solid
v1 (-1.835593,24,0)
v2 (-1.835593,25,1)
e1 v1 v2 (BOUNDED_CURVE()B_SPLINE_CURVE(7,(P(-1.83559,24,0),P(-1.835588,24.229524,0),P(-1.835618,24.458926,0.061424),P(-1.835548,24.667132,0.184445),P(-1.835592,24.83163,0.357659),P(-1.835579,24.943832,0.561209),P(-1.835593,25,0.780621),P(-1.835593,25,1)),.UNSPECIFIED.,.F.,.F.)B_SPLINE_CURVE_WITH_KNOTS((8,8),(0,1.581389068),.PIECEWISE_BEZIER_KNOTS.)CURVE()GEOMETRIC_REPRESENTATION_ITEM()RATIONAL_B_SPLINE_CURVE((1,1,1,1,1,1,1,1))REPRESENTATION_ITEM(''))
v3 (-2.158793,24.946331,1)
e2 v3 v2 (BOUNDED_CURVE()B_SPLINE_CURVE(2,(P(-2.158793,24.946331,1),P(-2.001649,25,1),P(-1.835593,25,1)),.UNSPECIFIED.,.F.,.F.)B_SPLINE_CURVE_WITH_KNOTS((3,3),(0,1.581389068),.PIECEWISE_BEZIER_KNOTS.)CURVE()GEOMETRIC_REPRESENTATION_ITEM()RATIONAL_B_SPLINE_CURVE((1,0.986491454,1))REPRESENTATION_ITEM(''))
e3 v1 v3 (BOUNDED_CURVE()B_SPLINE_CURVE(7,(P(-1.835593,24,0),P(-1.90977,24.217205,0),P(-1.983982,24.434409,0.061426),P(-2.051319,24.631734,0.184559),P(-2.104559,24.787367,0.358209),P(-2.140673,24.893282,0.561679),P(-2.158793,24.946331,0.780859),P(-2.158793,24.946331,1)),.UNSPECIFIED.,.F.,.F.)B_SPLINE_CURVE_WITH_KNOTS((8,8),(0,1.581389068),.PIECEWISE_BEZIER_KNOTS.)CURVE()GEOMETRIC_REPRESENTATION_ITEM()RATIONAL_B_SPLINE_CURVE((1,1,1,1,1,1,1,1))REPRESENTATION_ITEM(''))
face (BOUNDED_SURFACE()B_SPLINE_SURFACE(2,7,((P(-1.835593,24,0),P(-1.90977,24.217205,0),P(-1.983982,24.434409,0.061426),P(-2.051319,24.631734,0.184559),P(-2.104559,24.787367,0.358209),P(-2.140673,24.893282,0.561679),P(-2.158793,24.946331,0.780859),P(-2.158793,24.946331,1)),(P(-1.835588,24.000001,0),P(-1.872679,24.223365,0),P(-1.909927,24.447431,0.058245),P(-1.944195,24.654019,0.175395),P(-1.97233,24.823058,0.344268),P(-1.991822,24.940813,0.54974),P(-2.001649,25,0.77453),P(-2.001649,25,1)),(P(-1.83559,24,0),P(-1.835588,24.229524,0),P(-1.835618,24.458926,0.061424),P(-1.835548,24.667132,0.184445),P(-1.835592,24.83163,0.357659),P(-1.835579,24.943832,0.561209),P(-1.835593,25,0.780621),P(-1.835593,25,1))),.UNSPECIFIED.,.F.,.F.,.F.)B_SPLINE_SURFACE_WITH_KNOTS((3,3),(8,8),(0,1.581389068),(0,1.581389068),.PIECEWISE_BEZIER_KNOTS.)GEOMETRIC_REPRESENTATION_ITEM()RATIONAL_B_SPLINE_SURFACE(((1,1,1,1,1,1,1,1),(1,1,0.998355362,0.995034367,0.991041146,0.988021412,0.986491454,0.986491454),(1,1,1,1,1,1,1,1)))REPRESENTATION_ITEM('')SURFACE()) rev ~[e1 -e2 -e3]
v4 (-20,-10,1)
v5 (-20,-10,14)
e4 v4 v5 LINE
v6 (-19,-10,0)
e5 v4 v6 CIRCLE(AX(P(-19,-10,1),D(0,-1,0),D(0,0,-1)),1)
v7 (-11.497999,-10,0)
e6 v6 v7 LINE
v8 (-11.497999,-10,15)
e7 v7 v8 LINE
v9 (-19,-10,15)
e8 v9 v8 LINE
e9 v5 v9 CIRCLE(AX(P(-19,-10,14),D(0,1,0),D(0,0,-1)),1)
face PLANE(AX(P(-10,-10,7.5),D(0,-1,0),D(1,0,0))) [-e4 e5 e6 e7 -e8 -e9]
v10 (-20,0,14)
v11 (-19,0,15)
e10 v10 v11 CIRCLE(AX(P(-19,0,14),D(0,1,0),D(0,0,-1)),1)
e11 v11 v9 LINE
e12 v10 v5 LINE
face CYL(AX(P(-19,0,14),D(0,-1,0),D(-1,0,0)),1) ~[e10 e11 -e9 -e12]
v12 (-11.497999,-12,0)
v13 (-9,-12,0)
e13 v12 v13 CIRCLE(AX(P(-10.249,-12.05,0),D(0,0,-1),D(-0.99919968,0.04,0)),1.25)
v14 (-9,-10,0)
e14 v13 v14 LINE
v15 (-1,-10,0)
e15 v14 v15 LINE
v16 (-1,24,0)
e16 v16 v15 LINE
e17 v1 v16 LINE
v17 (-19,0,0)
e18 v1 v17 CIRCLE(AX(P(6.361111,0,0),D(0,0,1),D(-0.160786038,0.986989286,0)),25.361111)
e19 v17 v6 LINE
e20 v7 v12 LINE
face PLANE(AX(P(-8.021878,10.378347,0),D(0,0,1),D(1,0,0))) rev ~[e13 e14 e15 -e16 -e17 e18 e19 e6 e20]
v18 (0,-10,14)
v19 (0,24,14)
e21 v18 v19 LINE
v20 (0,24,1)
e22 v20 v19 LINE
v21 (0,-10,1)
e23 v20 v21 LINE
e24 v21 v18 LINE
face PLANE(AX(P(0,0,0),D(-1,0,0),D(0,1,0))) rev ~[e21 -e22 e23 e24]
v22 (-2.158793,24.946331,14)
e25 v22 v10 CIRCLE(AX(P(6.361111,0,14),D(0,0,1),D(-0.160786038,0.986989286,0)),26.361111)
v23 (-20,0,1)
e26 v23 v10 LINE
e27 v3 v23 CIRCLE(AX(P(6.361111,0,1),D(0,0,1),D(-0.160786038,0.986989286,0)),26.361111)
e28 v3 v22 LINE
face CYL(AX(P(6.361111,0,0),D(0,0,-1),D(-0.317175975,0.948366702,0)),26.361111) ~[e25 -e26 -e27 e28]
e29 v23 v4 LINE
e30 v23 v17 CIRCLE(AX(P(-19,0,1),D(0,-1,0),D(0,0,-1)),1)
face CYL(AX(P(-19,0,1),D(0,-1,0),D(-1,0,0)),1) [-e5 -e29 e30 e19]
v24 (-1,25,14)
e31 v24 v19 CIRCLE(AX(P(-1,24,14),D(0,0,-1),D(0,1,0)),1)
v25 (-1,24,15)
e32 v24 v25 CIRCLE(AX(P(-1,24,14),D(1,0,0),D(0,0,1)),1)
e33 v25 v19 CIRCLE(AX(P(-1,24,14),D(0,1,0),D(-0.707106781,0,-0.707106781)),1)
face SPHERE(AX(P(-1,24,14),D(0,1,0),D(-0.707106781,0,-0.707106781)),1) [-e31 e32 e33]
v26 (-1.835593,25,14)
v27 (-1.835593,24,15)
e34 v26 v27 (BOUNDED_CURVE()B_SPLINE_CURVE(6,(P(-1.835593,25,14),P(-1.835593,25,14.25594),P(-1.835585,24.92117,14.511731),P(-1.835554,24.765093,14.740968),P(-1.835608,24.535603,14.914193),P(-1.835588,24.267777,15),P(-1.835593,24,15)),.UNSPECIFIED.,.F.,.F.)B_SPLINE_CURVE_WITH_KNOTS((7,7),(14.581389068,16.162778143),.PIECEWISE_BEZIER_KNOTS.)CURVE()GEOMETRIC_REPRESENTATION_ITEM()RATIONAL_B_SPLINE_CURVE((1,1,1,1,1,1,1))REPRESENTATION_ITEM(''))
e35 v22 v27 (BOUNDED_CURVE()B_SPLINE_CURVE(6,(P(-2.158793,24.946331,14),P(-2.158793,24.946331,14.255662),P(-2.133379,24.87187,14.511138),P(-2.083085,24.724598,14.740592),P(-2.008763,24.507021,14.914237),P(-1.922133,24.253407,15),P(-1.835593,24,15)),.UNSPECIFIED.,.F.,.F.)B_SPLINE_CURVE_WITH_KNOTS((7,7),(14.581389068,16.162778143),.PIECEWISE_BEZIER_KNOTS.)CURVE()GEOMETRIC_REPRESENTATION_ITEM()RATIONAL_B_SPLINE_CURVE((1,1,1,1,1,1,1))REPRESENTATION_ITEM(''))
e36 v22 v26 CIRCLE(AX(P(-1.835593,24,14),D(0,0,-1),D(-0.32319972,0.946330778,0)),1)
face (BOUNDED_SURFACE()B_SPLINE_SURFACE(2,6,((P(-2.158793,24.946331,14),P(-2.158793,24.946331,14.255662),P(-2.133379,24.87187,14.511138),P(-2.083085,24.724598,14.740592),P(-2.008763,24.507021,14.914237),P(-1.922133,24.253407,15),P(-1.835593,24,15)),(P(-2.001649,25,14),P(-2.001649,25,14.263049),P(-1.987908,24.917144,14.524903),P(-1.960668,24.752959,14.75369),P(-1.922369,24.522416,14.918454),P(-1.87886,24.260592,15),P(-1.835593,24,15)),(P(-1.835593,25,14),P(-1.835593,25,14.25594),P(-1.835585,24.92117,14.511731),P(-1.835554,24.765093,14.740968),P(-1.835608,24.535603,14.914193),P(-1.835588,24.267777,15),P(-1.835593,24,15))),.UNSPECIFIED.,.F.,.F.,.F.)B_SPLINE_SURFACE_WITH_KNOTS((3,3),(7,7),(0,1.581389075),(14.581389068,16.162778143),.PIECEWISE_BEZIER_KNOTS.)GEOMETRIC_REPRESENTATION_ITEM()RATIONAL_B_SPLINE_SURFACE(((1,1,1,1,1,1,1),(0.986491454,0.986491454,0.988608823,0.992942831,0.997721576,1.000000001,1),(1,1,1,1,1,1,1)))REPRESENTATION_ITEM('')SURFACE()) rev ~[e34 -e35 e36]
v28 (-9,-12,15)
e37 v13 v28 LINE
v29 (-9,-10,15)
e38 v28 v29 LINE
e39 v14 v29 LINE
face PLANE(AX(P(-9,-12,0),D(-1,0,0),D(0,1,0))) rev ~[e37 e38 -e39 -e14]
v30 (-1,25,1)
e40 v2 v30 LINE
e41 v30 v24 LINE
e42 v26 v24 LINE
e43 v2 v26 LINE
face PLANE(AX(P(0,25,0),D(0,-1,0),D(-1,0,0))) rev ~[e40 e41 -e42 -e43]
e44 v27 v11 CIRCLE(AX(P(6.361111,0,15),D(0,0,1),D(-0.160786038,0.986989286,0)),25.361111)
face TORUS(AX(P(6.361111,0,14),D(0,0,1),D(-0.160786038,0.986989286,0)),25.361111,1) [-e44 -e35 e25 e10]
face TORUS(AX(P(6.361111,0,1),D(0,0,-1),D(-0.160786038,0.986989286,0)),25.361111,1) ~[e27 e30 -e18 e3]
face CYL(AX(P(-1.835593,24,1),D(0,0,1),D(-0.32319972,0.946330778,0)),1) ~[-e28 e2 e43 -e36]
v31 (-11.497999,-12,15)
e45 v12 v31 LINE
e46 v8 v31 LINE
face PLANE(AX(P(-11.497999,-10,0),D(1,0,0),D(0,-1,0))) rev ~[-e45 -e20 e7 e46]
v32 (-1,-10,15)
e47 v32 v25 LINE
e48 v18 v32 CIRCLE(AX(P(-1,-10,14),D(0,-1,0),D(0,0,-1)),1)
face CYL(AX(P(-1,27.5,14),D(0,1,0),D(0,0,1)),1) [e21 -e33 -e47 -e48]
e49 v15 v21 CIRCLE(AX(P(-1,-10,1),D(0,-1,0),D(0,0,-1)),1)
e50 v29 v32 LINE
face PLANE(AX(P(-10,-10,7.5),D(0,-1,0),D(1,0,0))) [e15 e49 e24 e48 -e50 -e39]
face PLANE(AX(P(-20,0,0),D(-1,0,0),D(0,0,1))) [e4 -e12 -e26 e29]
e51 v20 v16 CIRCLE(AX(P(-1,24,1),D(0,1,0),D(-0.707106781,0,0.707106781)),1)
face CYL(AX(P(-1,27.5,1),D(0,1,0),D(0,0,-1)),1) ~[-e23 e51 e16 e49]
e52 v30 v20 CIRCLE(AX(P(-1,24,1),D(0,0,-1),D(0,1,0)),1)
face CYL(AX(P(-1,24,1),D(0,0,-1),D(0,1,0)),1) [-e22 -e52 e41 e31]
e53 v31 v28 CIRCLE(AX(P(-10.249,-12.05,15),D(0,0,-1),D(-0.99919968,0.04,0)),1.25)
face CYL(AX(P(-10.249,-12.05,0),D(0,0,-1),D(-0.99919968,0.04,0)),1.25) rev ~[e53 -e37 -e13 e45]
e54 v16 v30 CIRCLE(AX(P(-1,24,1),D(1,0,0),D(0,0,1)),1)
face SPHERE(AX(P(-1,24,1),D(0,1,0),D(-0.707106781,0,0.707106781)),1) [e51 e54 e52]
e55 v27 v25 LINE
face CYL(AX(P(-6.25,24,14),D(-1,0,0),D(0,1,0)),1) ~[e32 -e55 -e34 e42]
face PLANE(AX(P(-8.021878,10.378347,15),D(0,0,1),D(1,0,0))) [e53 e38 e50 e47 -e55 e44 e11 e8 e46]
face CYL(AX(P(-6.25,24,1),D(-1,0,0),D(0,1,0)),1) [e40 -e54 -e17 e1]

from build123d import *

# Parameters (mm, degrees)
F0_W         = 20
F0_H         = 15
F1_DEPTH     = 10
F2_R         = 1
F4_DEPTH     = 15
F5_T1_DEPTH  = 30
F5_T3_DEPTH  = 8.75
F5_T6_ANGLE  = 80.7474763736
F5_T8_ANGLE  = 80.7474763736
F6_R         = 1
F7_T1_DEPTH  = 13
F7_S5_W      = 1
F7_S5_H      = 1
F7_T6_DEPTH  = 1
F7_S11_W     = 1
F7_S11_H     = 1
F7_T12_DEPTH = 1
F9_DEPTH     = 15


# Not quite as in the source:
# - a fillet or chamfer that OpenCascade refuses, or shapes differently, is made with other operations: its cross-section is extruded or revolved along the edge and cut away or added


with BuildPart() as f1:
    # F0 (on Front) → F1 (new body)
    with BuildSketch(Plane.XZ):
        with Locations((-10, 7.5)):
            Rectangle(F0_W, F0_H)
    extrude(amount=F1_DEPTH)

    # F2
    f2_edges = [f1.edges().sort_by_distance(p)[0] for p in [
        (-20, -5, 15),
        (0, -5, 15),
        (-20, -5, 0),
        (0, -5, 0),
    ]]
    fillet(f2_edges, radius=F2_R)

    # F3 (on Top) → F4 (join)
    with BuildSketch(Plane.XY):
        with BuildLine():
            Line((-20, 0), (0, 0))
            Line((0, 0), (0, 25))
            Line((0, 25), (-2, 25))
            ThreePointArc((-2, 25), (-15.0318358344, 15.4029218007), (-20, 0))
        make_face()
    extrude(amount=F4_DEPTH)

    # F5: fillet of radius 1 on 6 edges, made by hand

    # F5_s2 → F5_t1 (cut)
    with BuildSketch(Plane.XZ.offset(-27.5)):
        with BuildLine():
            ThreePointArc((-1, 15), (-0.2928932188, 14.7071067812), (0, 14))
            Line((0, 14), (0, 15))
            Line((0, 15), (-1, 15))
        make_face()
        with BuildLine():
            ThreePointArc((-1, 0), (-0.2928932188, 0.2928932188), (0, 1))
            Line((0, 1), (0, 0))
            Line((0, 0), (-1, 0))
        make_face()
    extrude(amount=F5_T1_DEPTH, mode=Mode.SUBTRACT)

    # F5_s4 → F5_t3 (cut)
    with BuildSketch(Plane.YZ.offset(-6.25)):
        with BuildLine():
            ThreePointArc((25, 14), (24.7071067812, 14.7071067812), (24, 15))
            Line((24, 15), (25, 15))
            Line((25, 15), (25, 14))
        make_face()
        with BuildLine():
            ThreePointArc((25, 1), (24.7071067812, 0.2928932188), (24, 0))
            Line((24, 0), (25, 0))
            Line((25, 0), (25, 1))
        make_face()
    extrude(amount=F5_T3_DEPTH, mode=Mode.SUBTRACT)

    # F5_s5 → F5_t6 (revolve, cut)
    with BuildSketch(Plane(origin=(6.1966627118, 1.0094707841, 0), x_dir=(0, 0, 1), z_dir=(0.9869892856, 0.1607860383, 0))):
        with BuildLine():
            ThreePointArc((14, -25.3383332565), (14.7071067812, -25.0454400377), (15, -24.3383332565))
            Line((15, -24.3383332565), (15, -25.3383332565))
            Line((15, -25.3383332565), (14, -25.3383332565))
        make_face()
    revolve(axis=Axis((6.3611111111, 0, 15), (0, 0, 1)), revolution_arc=F5_T6_ANGLE, mode=Mode.SUBTRACT)

    # F5_s7 → F5_t8 (revolve, cut)
    with BuildSketch(Plane(origin=(6.1966627118, 1.0094707841, 0), x_dir=(0, 0, 1), z_dir=(0.9869892856, 0.1607860383, 0))):
        with BuildLine():
            ThreePointArc((1, -25.3383332565), (0.2928932188, -25.0454400377), (0, -24.3383332565))
            Line((0, -24.3383332565), (0, -25.3383332565))
            Line((0, -25.3383332565), (1, -25.3383332565))
        make_face()
    revolve(axis=Axis((6.3611111111, 0, 0), (0, 0, 1)), revolution_arc=F5_T8_ANGLE, mode=Mode.SUBTRACT)

    # F6
    f6_edges = [f1.edges().sort_by_distance(p)[0] for p in [
        (-2, 25, 7.5),
    ]]
    fillet(f6_edges, radius=F6_R)

    # F7: fillet of radius 1 on 1 edges, made by hand

    # F7_s2 → F7_t1 (cut)
    with BuildSketch(Plane.XY.offset(1)):
        with BuildLine():
            ThreePointArc((-1, 25), (-0.2928932188, 24.7071067812), (0, 24))
            Line((0, 24), (0, 25))
            Line((0, 25), (-1, 25))
        make_face()
    extrude(amount=F7_T1_DEPTH, mode=Mode.SUBTRACT)


with BuildPart() as f7_tool4:
    # F7_s5 → F7_t6 (new body)
    with BuildSketch(Plane.XZ.offset(-24)):
        with Locations((-0.5, 0.5)):
            Rectangle(F7_S5_W, F7_S5_H)
    extrude(amount=-F7_T6_DEPTH)

    # F7_s7 → F7_t8 (revolve, cut)
    with BuildSketch(Plane(origin=(-1, 24, 1), x_dir=(-0.7071067812, 0, 0.7071067812), z_dir=(-0.7071067812, 0, -0.7071067812))):
        with BuildLine():
            ThreePointArc((0, -1), (1, 0), (0, 1))
            Line((0, 1), (0, -1))
        make_face()
    revolve(axis=Axis((-1, 24, 1), (0, 1, 0)), mode=Mode.SUBTRACT)


with BuildPart() as f1_1:
    add(f1.part)

    # F7_t3: cut F7_tool4
    add(f7_tool4.part, mode=Mode.SUBTRACT)


with BuildPart() as f7_tool10:
    # F7_s11 → F7_t12 (new body)
    with BuildSketch(Plane.XZ.offset(-24)):
        with Locations((-0.5, 14.5)):
            Rectangle(F7_S11_W, F7_S11_H)
    extrude(amount=-F7_T12_DEPTH)

    # F7_s13 → F7_t14 (revolve, cut)
    with BuildSketch(Plane(origin=(-1, 24, 14), x_dir=(-0.7071067812, 0, -0.7071067812), z_dir=(0.7071067812, 0, -0.7071067812))):
        with BuildLine():
            ThreePointArc((0, -1), (1, 0), (0, 1))
            Line((0, 1), (0, -1))
        make_face()
    revolve(axis=Axis((-1, 24, 14), (0, 1, 0)), mode=Mode.SUBTRACT)


with BuildPart() as f1_2:
    add(f1_1.part)

    # F7_t9: cut F7_tool10
    add(f7_tool10.part, mode=Mode.SUBTRACT)

    # F8 (on Top) → F9 (join, through all)
    with BuildSketch(Plane.XY):
        with BuildLine():
            Line((-9, -10), (-11.4979991994, -10))
            Line((-11.4979991994, -10), (-11.4979991994, -12))
            ThreePointArc((-11.4979991994, -12), (-10.2489995997, -10.8), (-9, -12))
            Line((-9, -12), (-9, -10))
        make_face()
    extrude(amount=F9_DEPTH)


solid = f1_2.part
